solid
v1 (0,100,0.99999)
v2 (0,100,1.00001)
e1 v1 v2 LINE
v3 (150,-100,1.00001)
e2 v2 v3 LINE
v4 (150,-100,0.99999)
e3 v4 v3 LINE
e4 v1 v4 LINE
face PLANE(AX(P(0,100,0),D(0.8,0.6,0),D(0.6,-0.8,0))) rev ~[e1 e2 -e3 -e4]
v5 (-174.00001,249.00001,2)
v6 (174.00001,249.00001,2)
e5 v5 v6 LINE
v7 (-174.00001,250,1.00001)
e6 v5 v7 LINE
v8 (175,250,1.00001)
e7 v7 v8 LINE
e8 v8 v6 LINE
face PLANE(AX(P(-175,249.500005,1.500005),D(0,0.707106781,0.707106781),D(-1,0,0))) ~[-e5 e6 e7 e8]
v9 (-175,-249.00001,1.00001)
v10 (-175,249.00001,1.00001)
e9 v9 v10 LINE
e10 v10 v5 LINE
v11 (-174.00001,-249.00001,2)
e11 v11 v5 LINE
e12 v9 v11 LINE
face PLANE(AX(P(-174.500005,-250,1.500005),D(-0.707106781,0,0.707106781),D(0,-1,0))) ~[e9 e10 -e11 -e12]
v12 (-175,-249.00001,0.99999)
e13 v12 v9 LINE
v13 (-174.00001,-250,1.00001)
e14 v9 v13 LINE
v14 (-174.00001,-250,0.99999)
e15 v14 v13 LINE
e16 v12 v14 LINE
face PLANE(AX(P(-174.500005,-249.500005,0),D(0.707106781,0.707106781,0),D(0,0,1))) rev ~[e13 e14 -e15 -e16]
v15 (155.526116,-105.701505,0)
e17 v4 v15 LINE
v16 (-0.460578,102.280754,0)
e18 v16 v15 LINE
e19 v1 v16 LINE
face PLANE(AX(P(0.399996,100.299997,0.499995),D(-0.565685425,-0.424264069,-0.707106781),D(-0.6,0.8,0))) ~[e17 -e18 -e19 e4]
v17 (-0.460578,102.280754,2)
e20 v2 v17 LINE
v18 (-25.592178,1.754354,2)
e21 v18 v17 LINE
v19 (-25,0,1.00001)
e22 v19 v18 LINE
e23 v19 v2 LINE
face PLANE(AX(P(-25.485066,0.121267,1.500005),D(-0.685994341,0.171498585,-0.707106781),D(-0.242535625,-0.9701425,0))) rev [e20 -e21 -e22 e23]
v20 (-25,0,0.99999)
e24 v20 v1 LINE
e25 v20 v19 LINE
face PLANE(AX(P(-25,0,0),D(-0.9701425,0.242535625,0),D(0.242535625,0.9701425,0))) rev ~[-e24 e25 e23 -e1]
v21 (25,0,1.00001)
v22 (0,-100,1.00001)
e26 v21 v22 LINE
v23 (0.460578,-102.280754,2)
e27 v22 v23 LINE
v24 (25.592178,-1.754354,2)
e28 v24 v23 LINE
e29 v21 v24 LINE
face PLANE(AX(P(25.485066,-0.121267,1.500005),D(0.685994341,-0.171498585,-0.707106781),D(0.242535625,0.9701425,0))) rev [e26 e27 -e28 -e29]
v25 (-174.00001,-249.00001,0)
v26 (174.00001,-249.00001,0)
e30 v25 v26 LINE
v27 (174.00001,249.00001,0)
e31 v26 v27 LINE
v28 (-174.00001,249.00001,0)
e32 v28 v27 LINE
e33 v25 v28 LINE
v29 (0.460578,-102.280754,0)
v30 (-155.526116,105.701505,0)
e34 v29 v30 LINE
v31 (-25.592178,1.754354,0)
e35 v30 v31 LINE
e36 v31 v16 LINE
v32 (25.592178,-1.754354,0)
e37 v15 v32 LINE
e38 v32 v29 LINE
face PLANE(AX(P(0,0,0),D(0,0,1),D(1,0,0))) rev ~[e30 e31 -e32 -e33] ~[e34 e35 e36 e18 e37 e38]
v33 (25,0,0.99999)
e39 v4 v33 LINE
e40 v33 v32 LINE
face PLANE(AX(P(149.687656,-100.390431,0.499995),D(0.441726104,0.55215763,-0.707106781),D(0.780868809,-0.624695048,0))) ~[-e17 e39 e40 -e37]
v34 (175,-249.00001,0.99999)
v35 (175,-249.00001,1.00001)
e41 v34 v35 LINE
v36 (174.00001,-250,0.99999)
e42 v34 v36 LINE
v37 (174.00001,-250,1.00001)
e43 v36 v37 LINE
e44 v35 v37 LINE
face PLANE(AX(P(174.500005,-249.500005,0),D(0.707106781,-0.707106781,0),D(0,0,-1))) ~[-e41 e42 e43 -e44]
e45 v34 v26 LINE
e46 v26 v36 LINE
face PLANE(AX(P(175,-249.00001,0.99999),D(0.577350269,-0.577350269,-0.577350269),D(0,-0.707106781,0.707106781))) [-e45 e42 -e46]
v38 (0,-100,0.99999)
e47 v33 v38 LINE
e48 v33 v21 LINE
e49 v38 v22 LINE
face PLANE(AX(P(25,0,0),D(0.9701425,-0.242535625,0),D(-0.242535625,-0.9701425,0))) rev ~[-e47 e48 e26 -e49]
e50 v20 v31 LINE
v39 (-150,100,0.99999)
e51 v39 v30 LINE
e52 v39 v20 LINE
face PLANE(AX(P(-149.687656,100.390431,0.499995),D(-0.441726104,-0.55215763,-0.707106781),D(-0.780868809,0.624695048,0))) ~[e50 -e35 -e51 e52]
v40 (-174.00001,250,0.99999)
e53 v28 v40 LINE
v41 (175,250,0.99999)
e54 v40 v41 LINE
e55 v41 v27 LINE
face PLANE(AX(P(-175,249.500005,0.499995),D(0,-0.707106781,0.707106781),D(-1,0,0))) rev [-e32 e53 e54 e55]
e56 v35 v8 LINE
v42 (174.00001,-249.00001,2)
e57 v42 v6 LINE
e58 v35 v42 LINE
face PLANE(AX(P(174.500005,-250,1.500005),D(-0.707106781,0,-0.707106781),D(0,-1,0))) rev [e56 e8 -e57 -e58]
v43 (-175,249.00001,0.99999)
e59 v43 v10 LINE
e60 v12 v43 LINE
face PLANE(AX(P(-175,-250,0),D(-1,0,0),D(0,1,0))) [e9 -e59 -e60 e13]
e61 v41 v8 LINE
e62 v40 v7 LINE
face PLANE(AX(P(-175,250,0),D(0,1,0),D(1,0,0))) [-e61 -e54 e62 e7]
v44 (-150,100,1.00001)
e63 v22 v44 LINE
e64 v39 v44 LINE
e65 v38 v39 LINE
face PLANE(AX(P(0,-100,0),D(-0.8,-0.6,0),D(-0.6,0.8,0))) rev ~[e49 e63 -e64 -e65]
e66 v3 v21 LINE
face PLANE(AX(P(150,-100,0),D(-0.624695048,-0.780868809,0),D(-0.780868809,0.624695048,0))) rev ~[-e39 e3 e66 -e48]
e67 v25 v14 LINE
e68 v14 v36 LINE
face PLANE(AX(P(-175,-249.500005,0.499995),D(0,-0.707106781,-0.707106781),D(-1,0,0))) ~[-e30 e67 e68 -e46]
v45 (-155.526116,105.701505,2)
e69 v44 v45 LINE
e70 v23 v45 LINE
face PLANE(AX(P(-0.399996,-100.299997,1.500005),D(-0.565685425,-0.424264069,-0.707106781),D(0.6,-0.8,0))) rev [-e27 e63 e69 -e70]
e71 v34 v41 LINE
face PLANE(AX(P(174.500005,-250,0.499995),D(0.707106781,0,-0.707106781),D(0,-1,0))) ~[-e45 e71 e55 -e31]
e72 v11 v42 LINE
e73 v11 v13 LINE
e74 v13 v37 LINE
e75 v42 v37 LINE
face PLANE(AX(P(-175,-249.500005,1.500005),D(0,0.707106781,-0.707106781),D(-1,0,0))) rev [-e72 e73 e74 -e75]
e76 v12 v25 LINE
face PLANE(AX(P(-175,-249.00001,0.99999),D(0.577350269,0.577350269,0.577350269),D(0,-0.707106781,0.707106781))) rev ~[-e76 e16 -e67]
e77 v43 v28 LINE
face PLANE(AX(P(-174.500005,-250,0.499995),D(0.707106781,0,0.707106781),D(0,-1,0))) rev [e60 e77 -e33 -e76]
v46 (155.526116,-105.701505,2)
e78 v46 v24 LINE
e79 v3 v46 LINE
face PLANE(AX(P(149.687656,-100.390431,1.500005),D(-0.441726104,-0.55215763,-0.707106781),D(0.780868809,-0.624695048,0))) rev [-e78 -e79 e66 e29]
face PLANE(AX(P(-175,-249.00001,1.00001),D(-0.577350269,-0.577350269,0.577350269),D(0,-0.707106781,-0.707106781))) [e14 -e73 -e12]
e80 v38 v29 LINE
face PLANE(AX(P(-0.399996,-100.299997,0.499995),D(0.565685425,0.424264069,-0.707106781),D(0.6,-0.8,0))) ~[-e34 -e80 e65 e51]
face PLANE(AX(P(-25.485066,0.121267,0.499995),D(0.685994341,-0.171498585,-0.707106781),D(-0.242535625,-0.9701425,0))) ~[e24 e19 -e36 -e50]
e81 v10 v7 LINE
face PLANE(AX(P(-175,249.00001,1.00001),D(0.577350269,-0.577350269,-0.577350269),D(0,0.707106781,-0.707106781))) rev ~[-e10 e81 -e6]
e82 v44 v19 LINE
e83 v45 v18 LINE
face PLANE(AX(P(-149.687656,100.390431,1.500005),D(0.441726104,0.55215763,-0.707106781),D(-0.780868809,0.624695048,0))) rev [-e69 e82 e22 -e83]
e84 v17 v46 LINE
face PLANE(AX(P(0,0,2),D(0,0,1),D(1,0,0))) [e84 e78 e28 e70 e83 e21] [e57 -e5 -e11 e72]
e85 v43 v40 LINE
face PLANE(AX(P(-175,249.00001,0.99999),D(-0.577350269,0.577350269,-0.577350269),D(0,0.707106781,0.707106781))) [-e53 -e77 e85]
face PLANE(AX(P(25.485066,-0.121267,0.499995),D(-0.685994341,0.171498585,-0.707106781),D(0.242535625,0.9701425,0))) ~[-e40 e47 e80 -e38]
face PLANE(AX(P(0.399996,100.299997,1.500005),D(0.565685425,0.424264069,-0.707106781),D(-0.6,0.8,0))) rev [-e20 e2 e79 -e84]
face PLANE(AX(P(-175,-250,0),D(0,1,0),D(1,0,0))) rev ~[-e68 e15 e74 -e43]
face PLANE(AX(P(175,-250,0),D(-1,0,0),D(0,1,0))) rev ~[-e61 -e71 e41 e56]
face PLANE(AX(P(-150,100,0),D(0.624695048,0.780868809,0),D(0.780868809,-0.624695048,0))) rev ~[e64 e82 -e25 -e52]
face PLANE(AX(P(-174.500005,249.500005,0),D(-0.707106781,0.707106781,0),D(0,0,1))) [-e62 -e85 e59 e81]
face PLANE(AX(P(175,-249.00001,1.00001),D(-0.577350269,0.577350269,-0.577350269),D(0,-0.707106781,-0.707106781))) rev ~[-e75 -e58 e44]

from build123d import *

# Parameters (mm, degrees)
F0_W     = 350
F0_H     = 500
F1_DEPTH = 2
F2_SIZE  = 0.99999


# Not quite as in the source:
# - a fillet or chamfer is up to 0.001 mm smaller than in the source, because OpenCascade refuses the exact size


with BuildPart() as f1:
    # F0 (on Top) → F1 (new body)
    with BuildSketch(Plane.XY):
        Rectangle(F0_W, F0_H)
        Polygon((150, 100), (150, -100), (0, -100), (-150, -100), (-150, 100), (0, 100), align=None, mode=Mode.SUBTRACT)
        Polygon((-150, -100), (0, -100), (-150, 100), align=None)
        Polygon((0, 100), (150, -100), (150, 100), align=None)
        Polygon((-25, 0), (0, 100), (-150, 100), align=None)
        Polygon((0, -100), (150, -100), (25, 0), align=None)
    extrude(amount=F1_DEPTH)

    # F2 (size 1 in the source; OpenCascade refuses exactly that, so slightly less here)
    f2_edges = [f1.edges().sort_by_distance(p)[0] for p in [
        (-75, 0, 2),
        (-87.5, 50, 2),
        (-12.5, 50, 2),
        (75, 0, 2),
        (87.5, -50, 2),
        (12.5, -50, 2),
        (0, -250, 2),
        (175, 0, 2),
        (0, 250, 2),
        (-175, 0, 2),
        (-75, 0, 0),
        (-87.5, 50, 0),
        (-12.5, 50, 0),
        (75, 0, 0),
        (87.5, -50, 0),
        (12.5, -50, 0),
        (0, -250, 0),
        (175, 0, 0),
        (0, 250, 0),
        (-175, 0, 0),
        (-175, -250, 1),
        (175, -250, 1),
        (-175, 250, 1),
    ]]
    chamfer(f2_edges, length=F2_SIZE)


solid = f1.part
